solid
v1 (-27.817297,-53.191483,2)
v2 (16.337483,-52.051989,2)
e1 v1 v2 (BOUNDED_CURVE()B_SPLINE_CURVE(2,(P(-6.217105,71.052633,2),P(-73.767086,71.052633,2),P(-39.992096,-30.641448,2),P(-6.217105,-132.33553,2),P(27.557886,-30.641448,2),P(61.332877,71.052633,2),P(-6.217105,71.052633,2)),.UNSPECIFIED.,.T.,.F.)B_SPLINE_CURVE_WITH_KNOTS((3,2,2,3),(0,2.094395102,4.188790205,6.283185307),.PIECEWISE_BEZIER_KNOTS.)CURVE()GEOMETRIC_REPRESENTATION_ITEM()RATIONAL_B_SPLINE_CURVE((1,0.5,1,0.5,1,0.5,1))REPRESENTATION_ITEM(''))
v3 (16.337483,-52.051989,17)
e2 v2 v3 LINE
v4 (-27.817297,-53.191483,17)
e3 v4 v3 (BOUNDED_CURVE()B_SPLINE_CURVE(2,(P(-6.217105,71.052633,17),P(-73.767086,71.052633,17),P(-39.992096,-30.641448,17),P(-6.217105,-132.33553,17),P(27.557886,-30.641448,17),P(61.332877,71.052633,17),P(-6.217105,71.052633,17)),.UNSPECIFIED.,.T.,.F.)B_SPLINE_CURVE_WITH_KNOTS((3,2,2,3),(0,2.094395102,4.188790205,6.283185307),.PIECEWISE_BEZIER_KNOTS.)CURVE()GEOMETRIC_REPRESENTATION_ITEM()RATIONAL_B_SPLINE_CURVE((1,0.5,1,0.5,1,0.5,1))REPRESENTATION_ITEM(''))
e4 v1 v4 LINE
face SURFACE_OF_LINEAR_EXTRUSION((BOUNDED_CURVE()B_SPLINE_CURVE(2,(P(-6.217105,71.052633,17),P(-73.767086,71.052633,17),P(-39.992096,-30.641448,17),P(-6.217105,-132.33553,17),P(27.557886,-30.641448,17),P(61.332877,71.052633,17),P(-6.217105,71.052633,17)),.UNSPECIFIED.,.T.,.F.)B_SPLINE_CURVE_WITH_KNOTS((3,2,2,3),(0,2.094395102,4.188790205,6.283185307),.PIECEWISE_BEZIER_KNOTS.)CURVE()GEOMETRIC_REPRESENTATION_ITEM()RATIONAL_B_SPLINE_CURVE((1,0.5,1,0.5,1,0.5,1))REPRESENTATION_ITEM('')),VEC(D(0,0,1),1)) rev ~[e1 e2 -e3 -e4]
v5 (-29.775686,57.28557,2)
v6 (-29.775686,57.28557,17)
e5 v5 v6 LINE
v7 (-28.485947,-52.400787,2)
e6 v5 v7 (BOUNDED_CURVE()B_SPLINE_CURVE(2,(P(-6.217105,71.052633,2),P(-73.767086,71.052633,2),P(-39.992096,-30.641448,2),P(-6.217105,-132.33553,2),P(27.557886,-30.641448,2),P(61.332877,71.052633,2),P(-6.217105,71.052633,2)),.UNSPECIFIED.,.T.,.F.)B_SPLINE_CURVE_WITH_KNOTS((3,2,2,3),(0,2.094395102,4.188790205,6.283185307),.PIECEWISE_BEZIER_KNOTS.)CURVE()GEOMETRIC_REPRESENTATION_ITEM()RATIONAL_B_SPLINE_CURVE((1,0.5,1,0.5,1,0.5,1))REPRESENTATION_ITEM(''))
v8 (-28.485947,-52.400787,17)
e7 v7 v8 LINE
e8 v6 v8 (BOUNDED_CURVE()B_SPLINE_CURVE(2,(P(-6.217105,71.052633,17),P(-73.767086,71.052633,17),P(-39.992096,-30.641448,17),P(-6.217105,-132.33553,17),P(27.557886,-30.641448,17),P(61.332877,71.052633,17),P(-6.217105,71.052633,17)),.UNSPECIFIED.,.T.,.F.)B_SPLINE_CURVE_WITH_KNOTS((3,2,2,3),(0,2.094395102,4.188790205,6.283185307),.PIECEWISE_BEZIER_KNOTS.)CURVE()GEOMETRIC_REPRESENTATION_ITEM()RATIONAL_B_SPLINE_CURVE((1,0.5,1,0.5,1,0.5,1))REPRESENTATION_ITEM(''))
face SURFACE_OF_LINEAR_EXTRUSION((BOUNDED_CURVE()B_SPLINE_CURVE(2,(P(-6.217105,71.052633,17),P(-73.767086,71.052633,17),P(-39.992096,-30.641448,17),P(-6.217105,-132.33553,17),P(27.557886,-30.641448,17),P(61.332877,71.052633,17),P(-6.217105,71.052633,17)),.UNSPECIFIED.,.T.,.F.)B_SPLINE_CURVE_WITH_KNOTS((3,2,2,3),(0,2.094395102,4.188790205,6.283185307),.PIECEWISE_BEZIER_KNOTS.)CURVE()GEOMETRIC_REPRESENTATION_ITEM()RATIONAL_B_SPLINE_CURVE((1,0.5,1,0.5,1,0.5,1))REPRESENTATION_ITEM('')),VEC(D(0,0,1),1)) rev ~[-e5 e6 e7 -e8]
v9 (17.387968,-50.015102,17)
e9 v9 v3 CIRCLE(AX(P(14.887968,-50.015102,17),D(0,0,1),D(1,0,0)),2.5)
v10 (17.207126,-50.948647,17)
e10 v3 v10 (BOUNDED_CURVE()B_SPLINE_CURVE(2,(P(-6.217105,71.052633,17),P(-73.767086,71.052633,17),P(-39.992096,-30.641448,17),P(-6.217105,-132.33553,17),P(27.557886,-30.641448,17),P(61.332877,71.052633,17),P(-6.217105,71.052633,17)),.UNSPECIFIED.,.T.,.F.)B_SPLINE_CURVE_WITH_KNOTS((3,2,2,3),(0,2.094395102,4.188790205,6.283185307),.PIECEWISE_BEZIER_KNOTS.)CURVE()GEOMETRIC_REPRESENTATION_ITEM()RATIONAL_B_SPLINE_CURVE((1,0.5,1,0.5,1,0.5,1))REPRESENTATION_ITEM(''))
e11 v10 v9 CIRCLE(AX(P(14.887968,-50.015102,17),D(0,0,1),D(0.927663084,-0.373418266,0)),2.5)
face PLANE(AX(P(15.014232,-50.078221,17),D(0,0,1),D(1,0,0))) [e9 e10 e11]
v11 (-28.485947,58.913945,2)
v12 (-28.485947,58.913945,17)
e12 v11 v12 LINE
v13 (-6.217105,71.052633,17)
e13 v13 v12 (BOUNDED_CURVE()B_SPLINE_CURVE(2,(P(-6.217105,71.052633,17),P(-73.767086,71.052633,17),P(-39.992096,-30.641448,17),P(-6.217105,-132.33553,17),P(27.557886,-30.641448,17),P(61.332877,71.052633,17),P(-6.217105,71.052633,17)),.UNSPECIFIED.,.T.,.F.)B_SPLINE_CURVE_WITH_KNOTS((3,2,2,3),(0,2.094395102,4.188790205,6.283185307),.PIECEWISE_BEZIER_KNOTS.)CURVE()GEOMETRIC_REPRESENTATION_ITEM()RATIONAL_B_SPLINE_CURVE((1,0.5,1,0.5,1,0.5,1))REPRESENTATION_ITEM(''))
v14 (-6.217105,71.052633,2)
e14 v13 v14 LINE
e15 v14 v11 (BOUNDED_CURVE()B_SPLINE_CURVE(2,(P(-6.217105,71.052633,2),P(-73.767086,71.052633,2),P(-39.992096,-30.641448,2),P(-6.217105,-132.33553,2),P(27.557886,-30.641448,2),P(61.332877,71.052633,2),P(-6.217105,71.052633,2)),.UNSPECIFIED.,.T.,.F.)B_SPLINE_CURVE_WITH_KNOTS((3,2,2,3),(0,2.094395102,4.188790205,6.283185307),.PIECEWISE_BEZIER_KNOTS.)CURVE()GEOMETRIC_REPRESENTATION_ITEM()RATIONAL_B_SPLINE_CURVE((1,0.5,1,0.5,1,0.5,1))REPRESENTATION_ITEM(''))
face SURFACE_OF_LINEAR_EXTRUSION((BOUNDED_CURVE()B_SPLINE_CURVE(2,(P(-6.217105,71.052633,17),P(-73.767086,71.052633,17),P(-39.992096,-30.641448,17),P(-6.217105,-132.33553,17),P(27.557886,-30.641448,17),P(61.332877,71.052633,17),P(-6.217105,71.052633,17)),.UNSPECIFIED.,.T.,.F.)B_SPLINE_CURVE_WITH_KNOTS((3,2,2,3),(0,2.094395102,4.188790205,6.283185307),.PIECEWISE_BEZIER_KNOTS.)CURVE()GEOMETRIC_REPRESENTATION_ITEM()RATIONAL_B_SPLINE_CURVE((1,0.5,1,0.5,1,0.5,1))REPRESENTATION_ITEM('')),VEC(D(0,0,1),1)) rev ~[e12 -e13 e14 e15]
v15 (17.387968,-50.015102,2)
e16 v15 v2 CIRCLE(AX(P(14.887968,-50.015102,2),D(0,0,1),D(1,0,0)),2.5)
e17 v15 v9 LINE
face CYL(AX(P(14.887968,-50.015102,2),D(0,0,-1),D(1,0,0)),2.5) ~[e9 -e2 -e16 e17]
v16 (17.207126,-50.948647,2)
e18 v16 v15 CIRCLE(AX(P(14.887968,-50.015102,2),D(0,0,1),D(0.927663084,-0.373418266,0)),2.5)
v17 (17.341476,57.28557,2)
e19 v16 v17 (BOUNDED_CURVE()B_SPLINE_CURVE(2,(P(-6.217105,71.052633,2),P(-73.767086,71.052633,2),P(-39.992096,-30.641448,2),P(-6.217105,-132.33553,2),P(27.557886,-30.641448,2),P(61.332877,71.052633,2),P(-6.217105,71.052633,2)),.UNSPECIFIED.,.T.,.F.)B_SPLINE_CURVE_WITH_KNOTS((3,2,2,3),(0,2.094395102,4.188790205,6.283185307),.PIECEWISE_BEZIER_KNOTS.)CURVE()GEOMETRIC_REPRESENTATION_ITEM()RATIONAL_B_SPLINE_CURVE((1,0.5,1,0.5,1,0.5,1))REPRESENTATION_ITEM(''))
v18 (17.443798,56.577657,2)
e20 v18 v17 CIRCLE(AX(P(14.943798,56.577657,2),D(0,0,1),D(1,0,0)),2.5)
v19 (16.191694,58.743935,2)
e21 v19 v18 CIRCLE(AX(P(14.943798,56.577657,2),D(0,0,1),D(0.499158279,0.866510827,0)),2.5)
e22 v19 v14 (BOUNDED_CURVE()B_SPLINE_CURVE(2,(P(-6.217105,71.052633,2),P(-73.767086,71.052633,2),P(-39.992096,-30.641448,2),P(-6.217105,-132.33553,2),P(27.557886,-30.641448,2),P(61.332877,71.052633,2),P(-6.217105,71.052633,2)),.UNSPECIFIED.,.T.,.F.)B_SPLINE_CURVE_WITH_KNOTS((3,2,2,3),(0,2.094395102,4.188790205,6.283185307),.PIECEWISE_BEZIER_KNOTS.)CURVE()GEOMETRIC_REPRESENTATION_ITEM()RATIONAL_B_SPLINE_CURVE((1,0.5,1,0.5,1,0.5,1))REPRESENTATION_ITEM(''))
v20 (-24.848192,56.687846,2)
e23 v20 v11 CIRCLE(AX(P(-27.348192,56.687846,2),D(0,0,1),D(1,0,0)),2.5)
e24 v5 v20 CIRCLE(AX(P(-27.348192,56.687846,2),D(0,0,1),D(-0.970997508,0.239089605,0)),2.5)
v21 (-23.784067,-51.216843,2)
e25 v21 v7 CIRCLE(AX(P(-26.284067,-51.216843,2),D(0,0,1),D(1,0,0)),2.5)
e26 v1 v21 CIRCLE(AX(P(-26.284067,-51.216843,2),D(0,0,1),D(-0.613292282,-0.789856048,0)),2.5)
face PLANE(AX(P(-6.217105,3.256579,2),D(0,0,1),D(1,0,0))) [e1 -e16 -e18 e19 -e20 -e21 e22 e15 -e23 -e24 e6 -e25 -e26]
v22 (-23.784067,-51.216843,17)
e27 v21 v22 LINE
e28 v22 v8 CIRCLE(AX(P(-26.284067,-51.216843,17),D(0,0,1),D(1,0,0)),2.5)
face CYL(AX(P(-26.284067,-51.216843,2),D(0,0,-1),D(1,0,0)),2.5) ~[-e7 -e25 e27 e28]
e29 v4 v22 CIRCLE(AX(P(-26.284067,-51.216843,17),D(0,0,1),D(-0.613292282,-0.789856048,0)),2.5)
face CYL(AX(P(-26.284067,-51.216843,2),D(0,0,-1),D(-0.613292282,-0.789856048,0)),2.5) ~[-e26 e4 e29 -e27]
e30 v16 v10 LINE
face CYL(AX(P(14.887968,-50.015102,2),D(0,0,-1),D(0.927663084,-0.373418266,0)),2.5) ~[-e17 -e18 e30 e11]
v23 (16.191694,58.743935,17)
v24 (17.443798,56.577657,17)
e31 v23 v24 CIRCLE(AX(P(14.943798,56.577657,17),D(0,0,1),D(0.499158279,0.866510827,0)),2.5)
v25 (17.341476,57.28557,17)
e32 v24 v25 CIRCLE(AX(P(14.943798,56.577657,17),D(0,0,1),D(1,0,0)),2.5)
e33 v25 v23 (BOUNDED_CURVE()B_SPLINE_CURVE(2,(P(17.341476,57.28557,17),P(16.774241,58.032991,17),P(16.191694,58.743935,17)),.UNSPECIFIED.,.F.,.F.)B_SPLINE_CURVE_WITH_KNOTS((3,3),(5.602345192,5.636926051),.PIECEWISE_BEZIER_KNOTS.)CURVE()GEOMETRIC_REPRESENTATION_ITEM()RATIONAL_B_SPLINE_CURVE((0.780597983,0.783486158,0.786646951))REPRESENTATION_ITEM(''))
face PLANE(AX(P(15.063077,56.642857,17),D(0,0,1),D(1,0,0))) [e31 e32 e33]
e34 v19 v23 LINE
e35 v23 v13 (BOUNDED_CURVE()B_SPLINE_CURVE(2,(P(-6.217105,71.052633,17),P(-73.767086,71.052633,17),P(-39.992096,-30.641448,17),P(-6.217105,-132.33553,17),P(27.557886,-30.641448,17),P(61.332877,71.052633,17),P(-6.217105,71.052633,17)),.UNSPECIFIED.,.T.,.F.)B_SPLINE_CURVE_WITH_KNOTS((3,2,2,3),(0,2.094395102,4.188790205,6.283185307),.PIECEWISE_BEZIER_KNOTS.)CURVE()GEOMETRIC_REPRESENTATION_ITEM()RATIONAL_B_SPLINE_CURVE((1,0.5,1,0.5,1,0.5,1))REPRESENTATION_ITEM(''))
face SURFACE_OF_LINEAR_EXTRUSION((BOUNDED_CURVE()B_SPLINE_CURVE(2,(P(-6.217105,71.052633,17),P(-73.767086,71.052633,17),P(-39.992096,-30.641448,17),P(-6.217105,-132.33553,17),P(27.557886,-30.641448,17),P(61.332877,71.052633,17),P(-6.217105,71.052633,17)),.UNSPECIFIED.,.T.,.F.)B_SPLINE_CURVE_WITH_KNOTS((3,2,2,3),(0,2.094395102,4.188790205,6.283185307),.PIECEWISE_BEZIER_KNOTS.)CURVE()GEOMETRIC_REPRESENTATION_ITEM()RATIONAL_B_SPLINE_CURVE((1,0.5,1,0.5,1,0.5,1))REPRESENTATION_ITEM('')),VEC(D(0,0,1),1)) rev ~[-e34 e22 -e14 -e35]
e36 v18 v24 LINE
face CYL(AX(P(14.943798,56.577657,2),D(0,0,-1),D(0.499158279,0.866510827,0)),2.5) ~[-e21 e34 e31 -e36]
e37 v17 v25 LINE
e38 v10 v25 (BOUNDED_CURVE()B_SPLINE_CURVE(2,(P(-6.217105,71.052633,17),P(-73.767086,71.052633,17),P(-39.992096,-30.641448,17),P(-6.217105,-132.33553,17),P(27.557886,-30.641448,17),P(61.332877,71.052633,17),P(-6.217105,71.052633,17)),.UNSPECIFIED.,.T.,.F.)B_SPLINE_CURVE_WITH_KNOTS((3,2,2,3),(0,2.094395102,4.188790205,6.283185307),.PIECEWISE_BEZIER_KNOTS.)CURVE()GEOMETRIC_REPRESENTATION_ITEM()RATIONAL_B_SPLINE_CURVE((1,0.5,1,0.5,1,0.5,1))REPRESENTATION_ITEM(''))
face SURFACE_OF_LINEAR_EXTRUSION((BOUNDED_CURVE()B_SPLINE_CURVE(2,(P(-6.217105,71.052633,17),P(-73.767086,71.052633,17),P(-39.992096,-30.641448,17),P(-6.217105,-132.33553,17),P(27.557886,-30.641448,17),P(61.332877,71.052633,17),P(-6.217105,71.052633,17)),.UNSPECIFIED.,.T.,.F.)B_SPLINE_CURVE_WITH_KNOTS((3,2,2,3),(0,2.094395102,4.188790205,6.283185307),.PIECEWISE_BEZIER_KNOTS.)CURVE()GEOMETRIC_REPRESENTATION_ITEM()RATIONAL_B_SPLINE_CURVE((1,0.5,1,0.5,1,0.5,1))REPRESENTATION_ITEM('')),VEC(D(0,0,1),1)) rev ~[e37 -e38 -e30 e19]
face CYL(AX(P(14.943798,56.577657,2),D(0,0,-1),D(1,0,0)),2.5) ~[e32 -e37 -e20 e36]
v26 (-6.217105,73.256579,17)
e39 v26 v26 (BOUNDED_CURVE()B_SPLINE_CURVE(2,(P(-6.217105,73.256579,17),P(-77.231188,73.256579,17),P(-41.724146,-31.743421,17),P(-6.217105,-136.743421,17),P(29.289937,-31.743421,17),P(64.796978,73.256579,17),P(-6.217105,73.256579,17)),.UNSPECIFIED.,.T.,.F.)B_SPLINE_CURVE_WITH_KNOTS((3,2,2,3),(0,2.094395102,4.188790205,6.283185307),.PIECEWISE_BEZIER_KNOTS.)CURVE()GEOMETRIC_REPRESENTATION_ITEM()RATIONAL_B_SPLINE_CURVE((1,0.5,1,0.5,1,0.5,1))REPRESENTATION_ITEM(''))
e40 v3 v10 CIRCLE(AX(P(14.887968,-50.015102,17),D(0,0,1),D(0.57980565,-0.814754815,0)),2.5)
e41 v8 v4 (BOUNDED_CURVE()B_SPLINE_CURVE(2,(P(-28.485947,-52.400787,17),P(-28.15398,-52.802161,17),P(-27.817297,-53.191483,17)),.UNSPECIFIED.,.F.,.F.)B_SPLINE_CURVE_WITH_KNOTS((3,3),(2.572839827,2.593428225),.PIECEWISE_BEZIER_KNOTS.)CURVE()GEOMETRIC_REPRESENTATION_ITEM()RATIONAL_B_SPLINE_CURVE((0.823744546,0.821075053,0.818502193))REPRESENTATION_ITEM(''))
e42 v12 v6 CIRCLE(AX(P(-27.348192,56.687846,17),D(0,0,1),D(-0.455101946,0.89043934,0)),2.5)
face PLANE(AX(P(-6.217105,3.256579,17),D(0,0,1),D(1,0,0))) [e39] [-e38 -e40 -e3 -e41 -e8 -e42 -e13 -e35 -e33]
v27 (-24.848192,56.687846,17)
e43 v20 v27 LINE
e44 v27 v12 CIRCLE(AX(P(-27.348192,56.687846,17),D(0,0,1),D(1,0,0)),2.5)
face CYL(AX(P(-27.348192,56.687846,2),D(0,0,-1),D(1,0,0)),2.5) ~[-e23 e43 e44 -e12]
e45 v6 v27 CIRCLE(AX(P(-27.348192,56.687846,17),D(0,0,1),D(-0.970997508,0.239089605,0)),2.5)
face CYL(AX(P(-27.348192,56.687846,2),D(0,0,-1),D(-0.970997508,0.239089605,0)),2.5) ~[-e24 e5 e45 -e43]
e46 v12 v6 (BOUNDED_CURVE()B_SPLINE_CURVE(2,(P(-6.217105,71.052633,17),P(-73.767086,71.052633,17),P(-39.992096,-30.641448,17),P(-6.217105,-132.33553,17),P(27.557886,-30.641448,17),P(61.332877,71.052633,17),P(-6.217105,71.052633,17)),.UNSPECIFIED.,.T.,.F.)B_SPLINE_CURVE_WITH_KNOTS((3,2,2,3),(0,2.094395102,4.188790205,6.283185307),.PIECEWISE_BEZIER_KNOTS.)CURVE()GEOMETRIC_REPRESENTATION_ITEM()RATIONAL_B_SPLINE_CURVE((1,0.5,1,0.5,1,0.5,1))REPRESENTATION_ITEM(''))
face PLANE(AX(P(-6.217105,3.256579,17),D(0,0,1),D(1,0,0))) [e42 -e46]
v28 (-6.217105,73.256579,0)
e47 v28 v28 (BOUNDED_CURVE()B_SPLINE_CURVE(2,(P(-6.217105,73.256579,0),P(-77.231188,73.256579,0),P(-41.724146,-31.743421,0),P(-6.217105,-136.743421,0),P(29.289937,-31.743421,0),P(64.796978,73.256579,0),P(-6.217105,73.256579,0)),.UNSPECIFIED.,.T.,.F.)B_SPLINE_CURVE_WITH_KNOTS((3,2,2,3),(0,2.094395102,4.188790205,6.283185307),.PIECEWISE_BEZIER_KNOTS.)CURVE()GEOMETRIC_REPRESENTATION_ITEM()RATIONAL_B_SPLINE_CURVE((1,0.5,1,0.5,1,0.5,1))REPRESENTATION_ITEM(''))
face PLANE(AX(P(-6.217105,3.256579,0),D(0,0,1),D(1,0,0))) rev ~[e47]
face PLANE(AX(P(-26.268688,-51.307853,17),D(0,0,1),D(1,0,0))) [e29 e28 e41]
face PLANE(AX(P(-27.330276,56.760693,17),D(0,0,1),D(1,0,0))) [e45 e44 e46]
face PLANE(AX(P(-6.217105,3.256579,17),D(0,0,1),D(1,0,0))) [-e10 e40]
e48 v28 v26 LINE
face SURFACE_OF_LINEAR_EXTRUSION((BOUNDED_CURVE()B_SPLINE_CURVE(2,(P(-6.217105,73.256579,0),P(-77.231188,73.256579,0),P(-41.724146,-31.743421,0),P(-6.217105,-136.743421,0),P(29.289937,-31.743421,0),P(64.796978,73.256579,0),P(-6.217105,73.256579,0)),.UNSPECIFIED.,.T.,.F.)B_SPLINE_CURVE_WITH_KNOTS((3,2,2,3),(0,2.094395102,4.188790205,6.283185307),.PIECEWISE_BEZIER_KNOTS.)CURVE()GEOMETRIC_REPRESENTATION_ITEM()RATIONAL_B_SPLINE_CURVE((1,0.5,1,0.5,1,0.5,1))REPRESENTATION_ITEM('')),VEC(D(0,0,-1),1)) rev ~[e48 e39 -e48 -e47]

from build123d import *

# Parameters (mm, degrees)
F1_DEPTH  = 17
F3_DEPTH  = 15
F5_DEPTH  = 15
F7_DEPTH  = 15
F9_DEPTH  = 15
F11_DEPTH = 15


with BuildPart() as f1:
    # F0 (on Top) → F1 (new body)
    with BuildSketch(Plane.XY):
        with BuildLine():
            add(Edge.make_bspline(
                [(-6.2171048485, 73.2565789297), (-77.2311879588, 73.2565789297), (-41.7241464036, -31.7434210703), (-6.2171048485, -136.7434210703), (29.2899367067, -31.7434210703), (64.7969782618, 73.2565789297), (-6.2171048485, 73.2565789297)],
                knots=[0, 0, 0, 2.0943951024, 2.0943951024, 4.1887902048, 4.1887902048, 6.2831853072, 6.2831853072, 6.2831853072], degree=2, weights=[1, 0.5, 1, 0.5, 1, 0.5, 1]))
        make_face()
    extrude(amount=F1_DEPTH)

    # F2 (on face) → F3 (cut)
    with BuildSketch(Plane.XY.offset(17)):
        with BuildLine():
            add(Edge.make_bspline(
                [(-6.2171048485, 71.0526332259), (-73.7670863437, 71.0526332259), (-39.9920955961, -30.6414482184), (-6.2171048485, -132.3355296627), (27.5578858991, -30.6414482184), (61.3328766467, 71.0526332259), (-6.2171048485, 71.0526332259)],
                knots=[0, 0, 0, 2.0943951024, 2.0943951024, 4.1887902048, 4.1887902048, 6.2831853072, 6.2831853072, 6.2831853072], degree=2, weights=[1, 0.5, 1, 0.5, 1, 0.5, 1]))
        make_face()
    extrude(amount=-F3_DEPTH, mode=Mode.SUBTRACT)

    # F4 (on face) → F5 (join)
    with BuildSketch(Plane.XY.offset(2)):
        with BuildLine():
            ThreePointArc((-29.7756858862, 57.2855702673), (-27.6492449133, 54.2060390081), (-24.8481921157, 56.6878462554))
            ThreePointArc((-24.8481921157, 56.6878462554), (-26.0432758657, 58.8202612198), (-28.48594698, 58.9139446065))
            add(Edge.make_bspline(
                [(-28.48594698, 58.9139446065), (-29.1403899926, 58.1226714215), (-29.7756858862, 57.2855702673)],
                knots=[0.6420928407, 0.6420928407, 0.6420928407, 0.6808401148, 0.6808401148, 0.6808401148], degree=2, weights=[0.7874125542, 0.783834135, 0.7805979828]))
        make_face()
        with BuildLine():
            add(Edge.make_bspline(
                [(-28.48594698, 58.9139446065), (-29.1403899926, 58.1226714215), (-29.7756858862, 57.2855702673)],
                knots=[0.6420928407, 0.6420928407, 0.6420928407, 0.6808401148, 0.6808401148, 0.6808401148], degree=2, weights=[0.7874125542, 0.783834135, 0.7805979828]))
            ThreePointArc((-28.48594698, 58.9139446065), (-29.3079498058, 58.2400542943), (-29.7756858862, 57.2855702673))
        make_face()
    extrude(amount=F5_DEPTH)

    # F6 (on face) → F7 (join)
    with BuildSketch(Plane.XY.offset(2)):
        with BuildLine():
            ThreePointArc((16.1916939477, 58.7439345546), (12.7793422864, 55.3266057789), (17.4437982507, 56.577657488))
            ThreePointArc((17.4437982507, 56.577657488), (17.4180855063, 56.9352921855), (17.3414761892, 57.2855702673))
            add(Edge.make_bspline(
                [(17.3414761892, 57.2855702673), (16.7742405528, 58.0329914466), (16.1916939477, 58.7439345546)],
                knots=[5.6023451924, 5.6023451924, 5.6023451924, 5.6369260508, 5.6369260508, 5.6369260508], degree=2, weights=[0.7805979828, 0.7834861581, 0.7866469513]))
        make_face()
    extrude(amount=F7_DEPTH)

    # F8 (on face) → F9 (join)
    with BuildSketch(Plane.XY.offset(2)):
        with BuildLine():
            ThreePointArc((-27.8172974331, -53.191482885), (-25.1847662143, -53.4621797963), (-23.7840667271, -51.2168427654))
            ThreePointArc((-23.7840667271, -51.2168427654), (-26.8945171213, -48.792518052), (-28.48594698, -52.4007867471))
            add(Edge.make_bspline(
                [(-28.48594698, -52.4007867471), (-28.1539802485, -52.8021606908), (-27.8172974331, -53.191482885)],
                knots=[2.5728398269, 2.5728398269, 2.5728398269, 2.5934282254, 2.5934282254, 2.5934282254], degree=2, weights=[0.8237445465, 0.8210750527, 0.8185021925]))
        make_face()
    extrude(amount=F9_DEPTH)

    # F10 (on face) → F11 (join)
    with BuildSketch(Plane.XY.offset(2)):
        with BuildLine():
            ThreePointArc((17.2071260982, -50.948647347), (17.3423414514, -50.4905518475), (17.3879683871, -50.0151016807))
            ThreePointArc((17.3879683871, -50.0151016807), (12.6660564501, -48.8691927208), (16.3374825114, -52.0519887181))
            add(Edge.make_bspline(
                [(16.3374825114, -52.0519887181), (16.7766850943, -51.5107523345), (17.2071260982, -50.948647347)],
                knots=[3.7192756497, 3.7192756497, 3.7192756497, 3.746975358, 3.746975358, 3.746975358], degree=2, weights=[0.8260785, 0.8297264389, 0.8335492953]))
        make_face()
        with BuildLine():
            add(Edge.make_bspline(
                [(16.3374825114, -52.0519887181), (16.7766850943, -51.5107523345), (17.2071260982, -50.948647347)],
                knots=[3.7192756497, 3.7192756497, 3.7192756497, 3.746975358, 3.746975358, 3.746975358], degree=2, weights=[0.8260785, 0.8297264389, 0.8335492953]))
            ThreePointArc((16.3374825114, -52.0519887181), (16.8513996683, -51.5626602753), (17.2071260982, -50.948647347))
        make_face()
    extrude(amount=F11_DEPTH)


solid = f1.part
